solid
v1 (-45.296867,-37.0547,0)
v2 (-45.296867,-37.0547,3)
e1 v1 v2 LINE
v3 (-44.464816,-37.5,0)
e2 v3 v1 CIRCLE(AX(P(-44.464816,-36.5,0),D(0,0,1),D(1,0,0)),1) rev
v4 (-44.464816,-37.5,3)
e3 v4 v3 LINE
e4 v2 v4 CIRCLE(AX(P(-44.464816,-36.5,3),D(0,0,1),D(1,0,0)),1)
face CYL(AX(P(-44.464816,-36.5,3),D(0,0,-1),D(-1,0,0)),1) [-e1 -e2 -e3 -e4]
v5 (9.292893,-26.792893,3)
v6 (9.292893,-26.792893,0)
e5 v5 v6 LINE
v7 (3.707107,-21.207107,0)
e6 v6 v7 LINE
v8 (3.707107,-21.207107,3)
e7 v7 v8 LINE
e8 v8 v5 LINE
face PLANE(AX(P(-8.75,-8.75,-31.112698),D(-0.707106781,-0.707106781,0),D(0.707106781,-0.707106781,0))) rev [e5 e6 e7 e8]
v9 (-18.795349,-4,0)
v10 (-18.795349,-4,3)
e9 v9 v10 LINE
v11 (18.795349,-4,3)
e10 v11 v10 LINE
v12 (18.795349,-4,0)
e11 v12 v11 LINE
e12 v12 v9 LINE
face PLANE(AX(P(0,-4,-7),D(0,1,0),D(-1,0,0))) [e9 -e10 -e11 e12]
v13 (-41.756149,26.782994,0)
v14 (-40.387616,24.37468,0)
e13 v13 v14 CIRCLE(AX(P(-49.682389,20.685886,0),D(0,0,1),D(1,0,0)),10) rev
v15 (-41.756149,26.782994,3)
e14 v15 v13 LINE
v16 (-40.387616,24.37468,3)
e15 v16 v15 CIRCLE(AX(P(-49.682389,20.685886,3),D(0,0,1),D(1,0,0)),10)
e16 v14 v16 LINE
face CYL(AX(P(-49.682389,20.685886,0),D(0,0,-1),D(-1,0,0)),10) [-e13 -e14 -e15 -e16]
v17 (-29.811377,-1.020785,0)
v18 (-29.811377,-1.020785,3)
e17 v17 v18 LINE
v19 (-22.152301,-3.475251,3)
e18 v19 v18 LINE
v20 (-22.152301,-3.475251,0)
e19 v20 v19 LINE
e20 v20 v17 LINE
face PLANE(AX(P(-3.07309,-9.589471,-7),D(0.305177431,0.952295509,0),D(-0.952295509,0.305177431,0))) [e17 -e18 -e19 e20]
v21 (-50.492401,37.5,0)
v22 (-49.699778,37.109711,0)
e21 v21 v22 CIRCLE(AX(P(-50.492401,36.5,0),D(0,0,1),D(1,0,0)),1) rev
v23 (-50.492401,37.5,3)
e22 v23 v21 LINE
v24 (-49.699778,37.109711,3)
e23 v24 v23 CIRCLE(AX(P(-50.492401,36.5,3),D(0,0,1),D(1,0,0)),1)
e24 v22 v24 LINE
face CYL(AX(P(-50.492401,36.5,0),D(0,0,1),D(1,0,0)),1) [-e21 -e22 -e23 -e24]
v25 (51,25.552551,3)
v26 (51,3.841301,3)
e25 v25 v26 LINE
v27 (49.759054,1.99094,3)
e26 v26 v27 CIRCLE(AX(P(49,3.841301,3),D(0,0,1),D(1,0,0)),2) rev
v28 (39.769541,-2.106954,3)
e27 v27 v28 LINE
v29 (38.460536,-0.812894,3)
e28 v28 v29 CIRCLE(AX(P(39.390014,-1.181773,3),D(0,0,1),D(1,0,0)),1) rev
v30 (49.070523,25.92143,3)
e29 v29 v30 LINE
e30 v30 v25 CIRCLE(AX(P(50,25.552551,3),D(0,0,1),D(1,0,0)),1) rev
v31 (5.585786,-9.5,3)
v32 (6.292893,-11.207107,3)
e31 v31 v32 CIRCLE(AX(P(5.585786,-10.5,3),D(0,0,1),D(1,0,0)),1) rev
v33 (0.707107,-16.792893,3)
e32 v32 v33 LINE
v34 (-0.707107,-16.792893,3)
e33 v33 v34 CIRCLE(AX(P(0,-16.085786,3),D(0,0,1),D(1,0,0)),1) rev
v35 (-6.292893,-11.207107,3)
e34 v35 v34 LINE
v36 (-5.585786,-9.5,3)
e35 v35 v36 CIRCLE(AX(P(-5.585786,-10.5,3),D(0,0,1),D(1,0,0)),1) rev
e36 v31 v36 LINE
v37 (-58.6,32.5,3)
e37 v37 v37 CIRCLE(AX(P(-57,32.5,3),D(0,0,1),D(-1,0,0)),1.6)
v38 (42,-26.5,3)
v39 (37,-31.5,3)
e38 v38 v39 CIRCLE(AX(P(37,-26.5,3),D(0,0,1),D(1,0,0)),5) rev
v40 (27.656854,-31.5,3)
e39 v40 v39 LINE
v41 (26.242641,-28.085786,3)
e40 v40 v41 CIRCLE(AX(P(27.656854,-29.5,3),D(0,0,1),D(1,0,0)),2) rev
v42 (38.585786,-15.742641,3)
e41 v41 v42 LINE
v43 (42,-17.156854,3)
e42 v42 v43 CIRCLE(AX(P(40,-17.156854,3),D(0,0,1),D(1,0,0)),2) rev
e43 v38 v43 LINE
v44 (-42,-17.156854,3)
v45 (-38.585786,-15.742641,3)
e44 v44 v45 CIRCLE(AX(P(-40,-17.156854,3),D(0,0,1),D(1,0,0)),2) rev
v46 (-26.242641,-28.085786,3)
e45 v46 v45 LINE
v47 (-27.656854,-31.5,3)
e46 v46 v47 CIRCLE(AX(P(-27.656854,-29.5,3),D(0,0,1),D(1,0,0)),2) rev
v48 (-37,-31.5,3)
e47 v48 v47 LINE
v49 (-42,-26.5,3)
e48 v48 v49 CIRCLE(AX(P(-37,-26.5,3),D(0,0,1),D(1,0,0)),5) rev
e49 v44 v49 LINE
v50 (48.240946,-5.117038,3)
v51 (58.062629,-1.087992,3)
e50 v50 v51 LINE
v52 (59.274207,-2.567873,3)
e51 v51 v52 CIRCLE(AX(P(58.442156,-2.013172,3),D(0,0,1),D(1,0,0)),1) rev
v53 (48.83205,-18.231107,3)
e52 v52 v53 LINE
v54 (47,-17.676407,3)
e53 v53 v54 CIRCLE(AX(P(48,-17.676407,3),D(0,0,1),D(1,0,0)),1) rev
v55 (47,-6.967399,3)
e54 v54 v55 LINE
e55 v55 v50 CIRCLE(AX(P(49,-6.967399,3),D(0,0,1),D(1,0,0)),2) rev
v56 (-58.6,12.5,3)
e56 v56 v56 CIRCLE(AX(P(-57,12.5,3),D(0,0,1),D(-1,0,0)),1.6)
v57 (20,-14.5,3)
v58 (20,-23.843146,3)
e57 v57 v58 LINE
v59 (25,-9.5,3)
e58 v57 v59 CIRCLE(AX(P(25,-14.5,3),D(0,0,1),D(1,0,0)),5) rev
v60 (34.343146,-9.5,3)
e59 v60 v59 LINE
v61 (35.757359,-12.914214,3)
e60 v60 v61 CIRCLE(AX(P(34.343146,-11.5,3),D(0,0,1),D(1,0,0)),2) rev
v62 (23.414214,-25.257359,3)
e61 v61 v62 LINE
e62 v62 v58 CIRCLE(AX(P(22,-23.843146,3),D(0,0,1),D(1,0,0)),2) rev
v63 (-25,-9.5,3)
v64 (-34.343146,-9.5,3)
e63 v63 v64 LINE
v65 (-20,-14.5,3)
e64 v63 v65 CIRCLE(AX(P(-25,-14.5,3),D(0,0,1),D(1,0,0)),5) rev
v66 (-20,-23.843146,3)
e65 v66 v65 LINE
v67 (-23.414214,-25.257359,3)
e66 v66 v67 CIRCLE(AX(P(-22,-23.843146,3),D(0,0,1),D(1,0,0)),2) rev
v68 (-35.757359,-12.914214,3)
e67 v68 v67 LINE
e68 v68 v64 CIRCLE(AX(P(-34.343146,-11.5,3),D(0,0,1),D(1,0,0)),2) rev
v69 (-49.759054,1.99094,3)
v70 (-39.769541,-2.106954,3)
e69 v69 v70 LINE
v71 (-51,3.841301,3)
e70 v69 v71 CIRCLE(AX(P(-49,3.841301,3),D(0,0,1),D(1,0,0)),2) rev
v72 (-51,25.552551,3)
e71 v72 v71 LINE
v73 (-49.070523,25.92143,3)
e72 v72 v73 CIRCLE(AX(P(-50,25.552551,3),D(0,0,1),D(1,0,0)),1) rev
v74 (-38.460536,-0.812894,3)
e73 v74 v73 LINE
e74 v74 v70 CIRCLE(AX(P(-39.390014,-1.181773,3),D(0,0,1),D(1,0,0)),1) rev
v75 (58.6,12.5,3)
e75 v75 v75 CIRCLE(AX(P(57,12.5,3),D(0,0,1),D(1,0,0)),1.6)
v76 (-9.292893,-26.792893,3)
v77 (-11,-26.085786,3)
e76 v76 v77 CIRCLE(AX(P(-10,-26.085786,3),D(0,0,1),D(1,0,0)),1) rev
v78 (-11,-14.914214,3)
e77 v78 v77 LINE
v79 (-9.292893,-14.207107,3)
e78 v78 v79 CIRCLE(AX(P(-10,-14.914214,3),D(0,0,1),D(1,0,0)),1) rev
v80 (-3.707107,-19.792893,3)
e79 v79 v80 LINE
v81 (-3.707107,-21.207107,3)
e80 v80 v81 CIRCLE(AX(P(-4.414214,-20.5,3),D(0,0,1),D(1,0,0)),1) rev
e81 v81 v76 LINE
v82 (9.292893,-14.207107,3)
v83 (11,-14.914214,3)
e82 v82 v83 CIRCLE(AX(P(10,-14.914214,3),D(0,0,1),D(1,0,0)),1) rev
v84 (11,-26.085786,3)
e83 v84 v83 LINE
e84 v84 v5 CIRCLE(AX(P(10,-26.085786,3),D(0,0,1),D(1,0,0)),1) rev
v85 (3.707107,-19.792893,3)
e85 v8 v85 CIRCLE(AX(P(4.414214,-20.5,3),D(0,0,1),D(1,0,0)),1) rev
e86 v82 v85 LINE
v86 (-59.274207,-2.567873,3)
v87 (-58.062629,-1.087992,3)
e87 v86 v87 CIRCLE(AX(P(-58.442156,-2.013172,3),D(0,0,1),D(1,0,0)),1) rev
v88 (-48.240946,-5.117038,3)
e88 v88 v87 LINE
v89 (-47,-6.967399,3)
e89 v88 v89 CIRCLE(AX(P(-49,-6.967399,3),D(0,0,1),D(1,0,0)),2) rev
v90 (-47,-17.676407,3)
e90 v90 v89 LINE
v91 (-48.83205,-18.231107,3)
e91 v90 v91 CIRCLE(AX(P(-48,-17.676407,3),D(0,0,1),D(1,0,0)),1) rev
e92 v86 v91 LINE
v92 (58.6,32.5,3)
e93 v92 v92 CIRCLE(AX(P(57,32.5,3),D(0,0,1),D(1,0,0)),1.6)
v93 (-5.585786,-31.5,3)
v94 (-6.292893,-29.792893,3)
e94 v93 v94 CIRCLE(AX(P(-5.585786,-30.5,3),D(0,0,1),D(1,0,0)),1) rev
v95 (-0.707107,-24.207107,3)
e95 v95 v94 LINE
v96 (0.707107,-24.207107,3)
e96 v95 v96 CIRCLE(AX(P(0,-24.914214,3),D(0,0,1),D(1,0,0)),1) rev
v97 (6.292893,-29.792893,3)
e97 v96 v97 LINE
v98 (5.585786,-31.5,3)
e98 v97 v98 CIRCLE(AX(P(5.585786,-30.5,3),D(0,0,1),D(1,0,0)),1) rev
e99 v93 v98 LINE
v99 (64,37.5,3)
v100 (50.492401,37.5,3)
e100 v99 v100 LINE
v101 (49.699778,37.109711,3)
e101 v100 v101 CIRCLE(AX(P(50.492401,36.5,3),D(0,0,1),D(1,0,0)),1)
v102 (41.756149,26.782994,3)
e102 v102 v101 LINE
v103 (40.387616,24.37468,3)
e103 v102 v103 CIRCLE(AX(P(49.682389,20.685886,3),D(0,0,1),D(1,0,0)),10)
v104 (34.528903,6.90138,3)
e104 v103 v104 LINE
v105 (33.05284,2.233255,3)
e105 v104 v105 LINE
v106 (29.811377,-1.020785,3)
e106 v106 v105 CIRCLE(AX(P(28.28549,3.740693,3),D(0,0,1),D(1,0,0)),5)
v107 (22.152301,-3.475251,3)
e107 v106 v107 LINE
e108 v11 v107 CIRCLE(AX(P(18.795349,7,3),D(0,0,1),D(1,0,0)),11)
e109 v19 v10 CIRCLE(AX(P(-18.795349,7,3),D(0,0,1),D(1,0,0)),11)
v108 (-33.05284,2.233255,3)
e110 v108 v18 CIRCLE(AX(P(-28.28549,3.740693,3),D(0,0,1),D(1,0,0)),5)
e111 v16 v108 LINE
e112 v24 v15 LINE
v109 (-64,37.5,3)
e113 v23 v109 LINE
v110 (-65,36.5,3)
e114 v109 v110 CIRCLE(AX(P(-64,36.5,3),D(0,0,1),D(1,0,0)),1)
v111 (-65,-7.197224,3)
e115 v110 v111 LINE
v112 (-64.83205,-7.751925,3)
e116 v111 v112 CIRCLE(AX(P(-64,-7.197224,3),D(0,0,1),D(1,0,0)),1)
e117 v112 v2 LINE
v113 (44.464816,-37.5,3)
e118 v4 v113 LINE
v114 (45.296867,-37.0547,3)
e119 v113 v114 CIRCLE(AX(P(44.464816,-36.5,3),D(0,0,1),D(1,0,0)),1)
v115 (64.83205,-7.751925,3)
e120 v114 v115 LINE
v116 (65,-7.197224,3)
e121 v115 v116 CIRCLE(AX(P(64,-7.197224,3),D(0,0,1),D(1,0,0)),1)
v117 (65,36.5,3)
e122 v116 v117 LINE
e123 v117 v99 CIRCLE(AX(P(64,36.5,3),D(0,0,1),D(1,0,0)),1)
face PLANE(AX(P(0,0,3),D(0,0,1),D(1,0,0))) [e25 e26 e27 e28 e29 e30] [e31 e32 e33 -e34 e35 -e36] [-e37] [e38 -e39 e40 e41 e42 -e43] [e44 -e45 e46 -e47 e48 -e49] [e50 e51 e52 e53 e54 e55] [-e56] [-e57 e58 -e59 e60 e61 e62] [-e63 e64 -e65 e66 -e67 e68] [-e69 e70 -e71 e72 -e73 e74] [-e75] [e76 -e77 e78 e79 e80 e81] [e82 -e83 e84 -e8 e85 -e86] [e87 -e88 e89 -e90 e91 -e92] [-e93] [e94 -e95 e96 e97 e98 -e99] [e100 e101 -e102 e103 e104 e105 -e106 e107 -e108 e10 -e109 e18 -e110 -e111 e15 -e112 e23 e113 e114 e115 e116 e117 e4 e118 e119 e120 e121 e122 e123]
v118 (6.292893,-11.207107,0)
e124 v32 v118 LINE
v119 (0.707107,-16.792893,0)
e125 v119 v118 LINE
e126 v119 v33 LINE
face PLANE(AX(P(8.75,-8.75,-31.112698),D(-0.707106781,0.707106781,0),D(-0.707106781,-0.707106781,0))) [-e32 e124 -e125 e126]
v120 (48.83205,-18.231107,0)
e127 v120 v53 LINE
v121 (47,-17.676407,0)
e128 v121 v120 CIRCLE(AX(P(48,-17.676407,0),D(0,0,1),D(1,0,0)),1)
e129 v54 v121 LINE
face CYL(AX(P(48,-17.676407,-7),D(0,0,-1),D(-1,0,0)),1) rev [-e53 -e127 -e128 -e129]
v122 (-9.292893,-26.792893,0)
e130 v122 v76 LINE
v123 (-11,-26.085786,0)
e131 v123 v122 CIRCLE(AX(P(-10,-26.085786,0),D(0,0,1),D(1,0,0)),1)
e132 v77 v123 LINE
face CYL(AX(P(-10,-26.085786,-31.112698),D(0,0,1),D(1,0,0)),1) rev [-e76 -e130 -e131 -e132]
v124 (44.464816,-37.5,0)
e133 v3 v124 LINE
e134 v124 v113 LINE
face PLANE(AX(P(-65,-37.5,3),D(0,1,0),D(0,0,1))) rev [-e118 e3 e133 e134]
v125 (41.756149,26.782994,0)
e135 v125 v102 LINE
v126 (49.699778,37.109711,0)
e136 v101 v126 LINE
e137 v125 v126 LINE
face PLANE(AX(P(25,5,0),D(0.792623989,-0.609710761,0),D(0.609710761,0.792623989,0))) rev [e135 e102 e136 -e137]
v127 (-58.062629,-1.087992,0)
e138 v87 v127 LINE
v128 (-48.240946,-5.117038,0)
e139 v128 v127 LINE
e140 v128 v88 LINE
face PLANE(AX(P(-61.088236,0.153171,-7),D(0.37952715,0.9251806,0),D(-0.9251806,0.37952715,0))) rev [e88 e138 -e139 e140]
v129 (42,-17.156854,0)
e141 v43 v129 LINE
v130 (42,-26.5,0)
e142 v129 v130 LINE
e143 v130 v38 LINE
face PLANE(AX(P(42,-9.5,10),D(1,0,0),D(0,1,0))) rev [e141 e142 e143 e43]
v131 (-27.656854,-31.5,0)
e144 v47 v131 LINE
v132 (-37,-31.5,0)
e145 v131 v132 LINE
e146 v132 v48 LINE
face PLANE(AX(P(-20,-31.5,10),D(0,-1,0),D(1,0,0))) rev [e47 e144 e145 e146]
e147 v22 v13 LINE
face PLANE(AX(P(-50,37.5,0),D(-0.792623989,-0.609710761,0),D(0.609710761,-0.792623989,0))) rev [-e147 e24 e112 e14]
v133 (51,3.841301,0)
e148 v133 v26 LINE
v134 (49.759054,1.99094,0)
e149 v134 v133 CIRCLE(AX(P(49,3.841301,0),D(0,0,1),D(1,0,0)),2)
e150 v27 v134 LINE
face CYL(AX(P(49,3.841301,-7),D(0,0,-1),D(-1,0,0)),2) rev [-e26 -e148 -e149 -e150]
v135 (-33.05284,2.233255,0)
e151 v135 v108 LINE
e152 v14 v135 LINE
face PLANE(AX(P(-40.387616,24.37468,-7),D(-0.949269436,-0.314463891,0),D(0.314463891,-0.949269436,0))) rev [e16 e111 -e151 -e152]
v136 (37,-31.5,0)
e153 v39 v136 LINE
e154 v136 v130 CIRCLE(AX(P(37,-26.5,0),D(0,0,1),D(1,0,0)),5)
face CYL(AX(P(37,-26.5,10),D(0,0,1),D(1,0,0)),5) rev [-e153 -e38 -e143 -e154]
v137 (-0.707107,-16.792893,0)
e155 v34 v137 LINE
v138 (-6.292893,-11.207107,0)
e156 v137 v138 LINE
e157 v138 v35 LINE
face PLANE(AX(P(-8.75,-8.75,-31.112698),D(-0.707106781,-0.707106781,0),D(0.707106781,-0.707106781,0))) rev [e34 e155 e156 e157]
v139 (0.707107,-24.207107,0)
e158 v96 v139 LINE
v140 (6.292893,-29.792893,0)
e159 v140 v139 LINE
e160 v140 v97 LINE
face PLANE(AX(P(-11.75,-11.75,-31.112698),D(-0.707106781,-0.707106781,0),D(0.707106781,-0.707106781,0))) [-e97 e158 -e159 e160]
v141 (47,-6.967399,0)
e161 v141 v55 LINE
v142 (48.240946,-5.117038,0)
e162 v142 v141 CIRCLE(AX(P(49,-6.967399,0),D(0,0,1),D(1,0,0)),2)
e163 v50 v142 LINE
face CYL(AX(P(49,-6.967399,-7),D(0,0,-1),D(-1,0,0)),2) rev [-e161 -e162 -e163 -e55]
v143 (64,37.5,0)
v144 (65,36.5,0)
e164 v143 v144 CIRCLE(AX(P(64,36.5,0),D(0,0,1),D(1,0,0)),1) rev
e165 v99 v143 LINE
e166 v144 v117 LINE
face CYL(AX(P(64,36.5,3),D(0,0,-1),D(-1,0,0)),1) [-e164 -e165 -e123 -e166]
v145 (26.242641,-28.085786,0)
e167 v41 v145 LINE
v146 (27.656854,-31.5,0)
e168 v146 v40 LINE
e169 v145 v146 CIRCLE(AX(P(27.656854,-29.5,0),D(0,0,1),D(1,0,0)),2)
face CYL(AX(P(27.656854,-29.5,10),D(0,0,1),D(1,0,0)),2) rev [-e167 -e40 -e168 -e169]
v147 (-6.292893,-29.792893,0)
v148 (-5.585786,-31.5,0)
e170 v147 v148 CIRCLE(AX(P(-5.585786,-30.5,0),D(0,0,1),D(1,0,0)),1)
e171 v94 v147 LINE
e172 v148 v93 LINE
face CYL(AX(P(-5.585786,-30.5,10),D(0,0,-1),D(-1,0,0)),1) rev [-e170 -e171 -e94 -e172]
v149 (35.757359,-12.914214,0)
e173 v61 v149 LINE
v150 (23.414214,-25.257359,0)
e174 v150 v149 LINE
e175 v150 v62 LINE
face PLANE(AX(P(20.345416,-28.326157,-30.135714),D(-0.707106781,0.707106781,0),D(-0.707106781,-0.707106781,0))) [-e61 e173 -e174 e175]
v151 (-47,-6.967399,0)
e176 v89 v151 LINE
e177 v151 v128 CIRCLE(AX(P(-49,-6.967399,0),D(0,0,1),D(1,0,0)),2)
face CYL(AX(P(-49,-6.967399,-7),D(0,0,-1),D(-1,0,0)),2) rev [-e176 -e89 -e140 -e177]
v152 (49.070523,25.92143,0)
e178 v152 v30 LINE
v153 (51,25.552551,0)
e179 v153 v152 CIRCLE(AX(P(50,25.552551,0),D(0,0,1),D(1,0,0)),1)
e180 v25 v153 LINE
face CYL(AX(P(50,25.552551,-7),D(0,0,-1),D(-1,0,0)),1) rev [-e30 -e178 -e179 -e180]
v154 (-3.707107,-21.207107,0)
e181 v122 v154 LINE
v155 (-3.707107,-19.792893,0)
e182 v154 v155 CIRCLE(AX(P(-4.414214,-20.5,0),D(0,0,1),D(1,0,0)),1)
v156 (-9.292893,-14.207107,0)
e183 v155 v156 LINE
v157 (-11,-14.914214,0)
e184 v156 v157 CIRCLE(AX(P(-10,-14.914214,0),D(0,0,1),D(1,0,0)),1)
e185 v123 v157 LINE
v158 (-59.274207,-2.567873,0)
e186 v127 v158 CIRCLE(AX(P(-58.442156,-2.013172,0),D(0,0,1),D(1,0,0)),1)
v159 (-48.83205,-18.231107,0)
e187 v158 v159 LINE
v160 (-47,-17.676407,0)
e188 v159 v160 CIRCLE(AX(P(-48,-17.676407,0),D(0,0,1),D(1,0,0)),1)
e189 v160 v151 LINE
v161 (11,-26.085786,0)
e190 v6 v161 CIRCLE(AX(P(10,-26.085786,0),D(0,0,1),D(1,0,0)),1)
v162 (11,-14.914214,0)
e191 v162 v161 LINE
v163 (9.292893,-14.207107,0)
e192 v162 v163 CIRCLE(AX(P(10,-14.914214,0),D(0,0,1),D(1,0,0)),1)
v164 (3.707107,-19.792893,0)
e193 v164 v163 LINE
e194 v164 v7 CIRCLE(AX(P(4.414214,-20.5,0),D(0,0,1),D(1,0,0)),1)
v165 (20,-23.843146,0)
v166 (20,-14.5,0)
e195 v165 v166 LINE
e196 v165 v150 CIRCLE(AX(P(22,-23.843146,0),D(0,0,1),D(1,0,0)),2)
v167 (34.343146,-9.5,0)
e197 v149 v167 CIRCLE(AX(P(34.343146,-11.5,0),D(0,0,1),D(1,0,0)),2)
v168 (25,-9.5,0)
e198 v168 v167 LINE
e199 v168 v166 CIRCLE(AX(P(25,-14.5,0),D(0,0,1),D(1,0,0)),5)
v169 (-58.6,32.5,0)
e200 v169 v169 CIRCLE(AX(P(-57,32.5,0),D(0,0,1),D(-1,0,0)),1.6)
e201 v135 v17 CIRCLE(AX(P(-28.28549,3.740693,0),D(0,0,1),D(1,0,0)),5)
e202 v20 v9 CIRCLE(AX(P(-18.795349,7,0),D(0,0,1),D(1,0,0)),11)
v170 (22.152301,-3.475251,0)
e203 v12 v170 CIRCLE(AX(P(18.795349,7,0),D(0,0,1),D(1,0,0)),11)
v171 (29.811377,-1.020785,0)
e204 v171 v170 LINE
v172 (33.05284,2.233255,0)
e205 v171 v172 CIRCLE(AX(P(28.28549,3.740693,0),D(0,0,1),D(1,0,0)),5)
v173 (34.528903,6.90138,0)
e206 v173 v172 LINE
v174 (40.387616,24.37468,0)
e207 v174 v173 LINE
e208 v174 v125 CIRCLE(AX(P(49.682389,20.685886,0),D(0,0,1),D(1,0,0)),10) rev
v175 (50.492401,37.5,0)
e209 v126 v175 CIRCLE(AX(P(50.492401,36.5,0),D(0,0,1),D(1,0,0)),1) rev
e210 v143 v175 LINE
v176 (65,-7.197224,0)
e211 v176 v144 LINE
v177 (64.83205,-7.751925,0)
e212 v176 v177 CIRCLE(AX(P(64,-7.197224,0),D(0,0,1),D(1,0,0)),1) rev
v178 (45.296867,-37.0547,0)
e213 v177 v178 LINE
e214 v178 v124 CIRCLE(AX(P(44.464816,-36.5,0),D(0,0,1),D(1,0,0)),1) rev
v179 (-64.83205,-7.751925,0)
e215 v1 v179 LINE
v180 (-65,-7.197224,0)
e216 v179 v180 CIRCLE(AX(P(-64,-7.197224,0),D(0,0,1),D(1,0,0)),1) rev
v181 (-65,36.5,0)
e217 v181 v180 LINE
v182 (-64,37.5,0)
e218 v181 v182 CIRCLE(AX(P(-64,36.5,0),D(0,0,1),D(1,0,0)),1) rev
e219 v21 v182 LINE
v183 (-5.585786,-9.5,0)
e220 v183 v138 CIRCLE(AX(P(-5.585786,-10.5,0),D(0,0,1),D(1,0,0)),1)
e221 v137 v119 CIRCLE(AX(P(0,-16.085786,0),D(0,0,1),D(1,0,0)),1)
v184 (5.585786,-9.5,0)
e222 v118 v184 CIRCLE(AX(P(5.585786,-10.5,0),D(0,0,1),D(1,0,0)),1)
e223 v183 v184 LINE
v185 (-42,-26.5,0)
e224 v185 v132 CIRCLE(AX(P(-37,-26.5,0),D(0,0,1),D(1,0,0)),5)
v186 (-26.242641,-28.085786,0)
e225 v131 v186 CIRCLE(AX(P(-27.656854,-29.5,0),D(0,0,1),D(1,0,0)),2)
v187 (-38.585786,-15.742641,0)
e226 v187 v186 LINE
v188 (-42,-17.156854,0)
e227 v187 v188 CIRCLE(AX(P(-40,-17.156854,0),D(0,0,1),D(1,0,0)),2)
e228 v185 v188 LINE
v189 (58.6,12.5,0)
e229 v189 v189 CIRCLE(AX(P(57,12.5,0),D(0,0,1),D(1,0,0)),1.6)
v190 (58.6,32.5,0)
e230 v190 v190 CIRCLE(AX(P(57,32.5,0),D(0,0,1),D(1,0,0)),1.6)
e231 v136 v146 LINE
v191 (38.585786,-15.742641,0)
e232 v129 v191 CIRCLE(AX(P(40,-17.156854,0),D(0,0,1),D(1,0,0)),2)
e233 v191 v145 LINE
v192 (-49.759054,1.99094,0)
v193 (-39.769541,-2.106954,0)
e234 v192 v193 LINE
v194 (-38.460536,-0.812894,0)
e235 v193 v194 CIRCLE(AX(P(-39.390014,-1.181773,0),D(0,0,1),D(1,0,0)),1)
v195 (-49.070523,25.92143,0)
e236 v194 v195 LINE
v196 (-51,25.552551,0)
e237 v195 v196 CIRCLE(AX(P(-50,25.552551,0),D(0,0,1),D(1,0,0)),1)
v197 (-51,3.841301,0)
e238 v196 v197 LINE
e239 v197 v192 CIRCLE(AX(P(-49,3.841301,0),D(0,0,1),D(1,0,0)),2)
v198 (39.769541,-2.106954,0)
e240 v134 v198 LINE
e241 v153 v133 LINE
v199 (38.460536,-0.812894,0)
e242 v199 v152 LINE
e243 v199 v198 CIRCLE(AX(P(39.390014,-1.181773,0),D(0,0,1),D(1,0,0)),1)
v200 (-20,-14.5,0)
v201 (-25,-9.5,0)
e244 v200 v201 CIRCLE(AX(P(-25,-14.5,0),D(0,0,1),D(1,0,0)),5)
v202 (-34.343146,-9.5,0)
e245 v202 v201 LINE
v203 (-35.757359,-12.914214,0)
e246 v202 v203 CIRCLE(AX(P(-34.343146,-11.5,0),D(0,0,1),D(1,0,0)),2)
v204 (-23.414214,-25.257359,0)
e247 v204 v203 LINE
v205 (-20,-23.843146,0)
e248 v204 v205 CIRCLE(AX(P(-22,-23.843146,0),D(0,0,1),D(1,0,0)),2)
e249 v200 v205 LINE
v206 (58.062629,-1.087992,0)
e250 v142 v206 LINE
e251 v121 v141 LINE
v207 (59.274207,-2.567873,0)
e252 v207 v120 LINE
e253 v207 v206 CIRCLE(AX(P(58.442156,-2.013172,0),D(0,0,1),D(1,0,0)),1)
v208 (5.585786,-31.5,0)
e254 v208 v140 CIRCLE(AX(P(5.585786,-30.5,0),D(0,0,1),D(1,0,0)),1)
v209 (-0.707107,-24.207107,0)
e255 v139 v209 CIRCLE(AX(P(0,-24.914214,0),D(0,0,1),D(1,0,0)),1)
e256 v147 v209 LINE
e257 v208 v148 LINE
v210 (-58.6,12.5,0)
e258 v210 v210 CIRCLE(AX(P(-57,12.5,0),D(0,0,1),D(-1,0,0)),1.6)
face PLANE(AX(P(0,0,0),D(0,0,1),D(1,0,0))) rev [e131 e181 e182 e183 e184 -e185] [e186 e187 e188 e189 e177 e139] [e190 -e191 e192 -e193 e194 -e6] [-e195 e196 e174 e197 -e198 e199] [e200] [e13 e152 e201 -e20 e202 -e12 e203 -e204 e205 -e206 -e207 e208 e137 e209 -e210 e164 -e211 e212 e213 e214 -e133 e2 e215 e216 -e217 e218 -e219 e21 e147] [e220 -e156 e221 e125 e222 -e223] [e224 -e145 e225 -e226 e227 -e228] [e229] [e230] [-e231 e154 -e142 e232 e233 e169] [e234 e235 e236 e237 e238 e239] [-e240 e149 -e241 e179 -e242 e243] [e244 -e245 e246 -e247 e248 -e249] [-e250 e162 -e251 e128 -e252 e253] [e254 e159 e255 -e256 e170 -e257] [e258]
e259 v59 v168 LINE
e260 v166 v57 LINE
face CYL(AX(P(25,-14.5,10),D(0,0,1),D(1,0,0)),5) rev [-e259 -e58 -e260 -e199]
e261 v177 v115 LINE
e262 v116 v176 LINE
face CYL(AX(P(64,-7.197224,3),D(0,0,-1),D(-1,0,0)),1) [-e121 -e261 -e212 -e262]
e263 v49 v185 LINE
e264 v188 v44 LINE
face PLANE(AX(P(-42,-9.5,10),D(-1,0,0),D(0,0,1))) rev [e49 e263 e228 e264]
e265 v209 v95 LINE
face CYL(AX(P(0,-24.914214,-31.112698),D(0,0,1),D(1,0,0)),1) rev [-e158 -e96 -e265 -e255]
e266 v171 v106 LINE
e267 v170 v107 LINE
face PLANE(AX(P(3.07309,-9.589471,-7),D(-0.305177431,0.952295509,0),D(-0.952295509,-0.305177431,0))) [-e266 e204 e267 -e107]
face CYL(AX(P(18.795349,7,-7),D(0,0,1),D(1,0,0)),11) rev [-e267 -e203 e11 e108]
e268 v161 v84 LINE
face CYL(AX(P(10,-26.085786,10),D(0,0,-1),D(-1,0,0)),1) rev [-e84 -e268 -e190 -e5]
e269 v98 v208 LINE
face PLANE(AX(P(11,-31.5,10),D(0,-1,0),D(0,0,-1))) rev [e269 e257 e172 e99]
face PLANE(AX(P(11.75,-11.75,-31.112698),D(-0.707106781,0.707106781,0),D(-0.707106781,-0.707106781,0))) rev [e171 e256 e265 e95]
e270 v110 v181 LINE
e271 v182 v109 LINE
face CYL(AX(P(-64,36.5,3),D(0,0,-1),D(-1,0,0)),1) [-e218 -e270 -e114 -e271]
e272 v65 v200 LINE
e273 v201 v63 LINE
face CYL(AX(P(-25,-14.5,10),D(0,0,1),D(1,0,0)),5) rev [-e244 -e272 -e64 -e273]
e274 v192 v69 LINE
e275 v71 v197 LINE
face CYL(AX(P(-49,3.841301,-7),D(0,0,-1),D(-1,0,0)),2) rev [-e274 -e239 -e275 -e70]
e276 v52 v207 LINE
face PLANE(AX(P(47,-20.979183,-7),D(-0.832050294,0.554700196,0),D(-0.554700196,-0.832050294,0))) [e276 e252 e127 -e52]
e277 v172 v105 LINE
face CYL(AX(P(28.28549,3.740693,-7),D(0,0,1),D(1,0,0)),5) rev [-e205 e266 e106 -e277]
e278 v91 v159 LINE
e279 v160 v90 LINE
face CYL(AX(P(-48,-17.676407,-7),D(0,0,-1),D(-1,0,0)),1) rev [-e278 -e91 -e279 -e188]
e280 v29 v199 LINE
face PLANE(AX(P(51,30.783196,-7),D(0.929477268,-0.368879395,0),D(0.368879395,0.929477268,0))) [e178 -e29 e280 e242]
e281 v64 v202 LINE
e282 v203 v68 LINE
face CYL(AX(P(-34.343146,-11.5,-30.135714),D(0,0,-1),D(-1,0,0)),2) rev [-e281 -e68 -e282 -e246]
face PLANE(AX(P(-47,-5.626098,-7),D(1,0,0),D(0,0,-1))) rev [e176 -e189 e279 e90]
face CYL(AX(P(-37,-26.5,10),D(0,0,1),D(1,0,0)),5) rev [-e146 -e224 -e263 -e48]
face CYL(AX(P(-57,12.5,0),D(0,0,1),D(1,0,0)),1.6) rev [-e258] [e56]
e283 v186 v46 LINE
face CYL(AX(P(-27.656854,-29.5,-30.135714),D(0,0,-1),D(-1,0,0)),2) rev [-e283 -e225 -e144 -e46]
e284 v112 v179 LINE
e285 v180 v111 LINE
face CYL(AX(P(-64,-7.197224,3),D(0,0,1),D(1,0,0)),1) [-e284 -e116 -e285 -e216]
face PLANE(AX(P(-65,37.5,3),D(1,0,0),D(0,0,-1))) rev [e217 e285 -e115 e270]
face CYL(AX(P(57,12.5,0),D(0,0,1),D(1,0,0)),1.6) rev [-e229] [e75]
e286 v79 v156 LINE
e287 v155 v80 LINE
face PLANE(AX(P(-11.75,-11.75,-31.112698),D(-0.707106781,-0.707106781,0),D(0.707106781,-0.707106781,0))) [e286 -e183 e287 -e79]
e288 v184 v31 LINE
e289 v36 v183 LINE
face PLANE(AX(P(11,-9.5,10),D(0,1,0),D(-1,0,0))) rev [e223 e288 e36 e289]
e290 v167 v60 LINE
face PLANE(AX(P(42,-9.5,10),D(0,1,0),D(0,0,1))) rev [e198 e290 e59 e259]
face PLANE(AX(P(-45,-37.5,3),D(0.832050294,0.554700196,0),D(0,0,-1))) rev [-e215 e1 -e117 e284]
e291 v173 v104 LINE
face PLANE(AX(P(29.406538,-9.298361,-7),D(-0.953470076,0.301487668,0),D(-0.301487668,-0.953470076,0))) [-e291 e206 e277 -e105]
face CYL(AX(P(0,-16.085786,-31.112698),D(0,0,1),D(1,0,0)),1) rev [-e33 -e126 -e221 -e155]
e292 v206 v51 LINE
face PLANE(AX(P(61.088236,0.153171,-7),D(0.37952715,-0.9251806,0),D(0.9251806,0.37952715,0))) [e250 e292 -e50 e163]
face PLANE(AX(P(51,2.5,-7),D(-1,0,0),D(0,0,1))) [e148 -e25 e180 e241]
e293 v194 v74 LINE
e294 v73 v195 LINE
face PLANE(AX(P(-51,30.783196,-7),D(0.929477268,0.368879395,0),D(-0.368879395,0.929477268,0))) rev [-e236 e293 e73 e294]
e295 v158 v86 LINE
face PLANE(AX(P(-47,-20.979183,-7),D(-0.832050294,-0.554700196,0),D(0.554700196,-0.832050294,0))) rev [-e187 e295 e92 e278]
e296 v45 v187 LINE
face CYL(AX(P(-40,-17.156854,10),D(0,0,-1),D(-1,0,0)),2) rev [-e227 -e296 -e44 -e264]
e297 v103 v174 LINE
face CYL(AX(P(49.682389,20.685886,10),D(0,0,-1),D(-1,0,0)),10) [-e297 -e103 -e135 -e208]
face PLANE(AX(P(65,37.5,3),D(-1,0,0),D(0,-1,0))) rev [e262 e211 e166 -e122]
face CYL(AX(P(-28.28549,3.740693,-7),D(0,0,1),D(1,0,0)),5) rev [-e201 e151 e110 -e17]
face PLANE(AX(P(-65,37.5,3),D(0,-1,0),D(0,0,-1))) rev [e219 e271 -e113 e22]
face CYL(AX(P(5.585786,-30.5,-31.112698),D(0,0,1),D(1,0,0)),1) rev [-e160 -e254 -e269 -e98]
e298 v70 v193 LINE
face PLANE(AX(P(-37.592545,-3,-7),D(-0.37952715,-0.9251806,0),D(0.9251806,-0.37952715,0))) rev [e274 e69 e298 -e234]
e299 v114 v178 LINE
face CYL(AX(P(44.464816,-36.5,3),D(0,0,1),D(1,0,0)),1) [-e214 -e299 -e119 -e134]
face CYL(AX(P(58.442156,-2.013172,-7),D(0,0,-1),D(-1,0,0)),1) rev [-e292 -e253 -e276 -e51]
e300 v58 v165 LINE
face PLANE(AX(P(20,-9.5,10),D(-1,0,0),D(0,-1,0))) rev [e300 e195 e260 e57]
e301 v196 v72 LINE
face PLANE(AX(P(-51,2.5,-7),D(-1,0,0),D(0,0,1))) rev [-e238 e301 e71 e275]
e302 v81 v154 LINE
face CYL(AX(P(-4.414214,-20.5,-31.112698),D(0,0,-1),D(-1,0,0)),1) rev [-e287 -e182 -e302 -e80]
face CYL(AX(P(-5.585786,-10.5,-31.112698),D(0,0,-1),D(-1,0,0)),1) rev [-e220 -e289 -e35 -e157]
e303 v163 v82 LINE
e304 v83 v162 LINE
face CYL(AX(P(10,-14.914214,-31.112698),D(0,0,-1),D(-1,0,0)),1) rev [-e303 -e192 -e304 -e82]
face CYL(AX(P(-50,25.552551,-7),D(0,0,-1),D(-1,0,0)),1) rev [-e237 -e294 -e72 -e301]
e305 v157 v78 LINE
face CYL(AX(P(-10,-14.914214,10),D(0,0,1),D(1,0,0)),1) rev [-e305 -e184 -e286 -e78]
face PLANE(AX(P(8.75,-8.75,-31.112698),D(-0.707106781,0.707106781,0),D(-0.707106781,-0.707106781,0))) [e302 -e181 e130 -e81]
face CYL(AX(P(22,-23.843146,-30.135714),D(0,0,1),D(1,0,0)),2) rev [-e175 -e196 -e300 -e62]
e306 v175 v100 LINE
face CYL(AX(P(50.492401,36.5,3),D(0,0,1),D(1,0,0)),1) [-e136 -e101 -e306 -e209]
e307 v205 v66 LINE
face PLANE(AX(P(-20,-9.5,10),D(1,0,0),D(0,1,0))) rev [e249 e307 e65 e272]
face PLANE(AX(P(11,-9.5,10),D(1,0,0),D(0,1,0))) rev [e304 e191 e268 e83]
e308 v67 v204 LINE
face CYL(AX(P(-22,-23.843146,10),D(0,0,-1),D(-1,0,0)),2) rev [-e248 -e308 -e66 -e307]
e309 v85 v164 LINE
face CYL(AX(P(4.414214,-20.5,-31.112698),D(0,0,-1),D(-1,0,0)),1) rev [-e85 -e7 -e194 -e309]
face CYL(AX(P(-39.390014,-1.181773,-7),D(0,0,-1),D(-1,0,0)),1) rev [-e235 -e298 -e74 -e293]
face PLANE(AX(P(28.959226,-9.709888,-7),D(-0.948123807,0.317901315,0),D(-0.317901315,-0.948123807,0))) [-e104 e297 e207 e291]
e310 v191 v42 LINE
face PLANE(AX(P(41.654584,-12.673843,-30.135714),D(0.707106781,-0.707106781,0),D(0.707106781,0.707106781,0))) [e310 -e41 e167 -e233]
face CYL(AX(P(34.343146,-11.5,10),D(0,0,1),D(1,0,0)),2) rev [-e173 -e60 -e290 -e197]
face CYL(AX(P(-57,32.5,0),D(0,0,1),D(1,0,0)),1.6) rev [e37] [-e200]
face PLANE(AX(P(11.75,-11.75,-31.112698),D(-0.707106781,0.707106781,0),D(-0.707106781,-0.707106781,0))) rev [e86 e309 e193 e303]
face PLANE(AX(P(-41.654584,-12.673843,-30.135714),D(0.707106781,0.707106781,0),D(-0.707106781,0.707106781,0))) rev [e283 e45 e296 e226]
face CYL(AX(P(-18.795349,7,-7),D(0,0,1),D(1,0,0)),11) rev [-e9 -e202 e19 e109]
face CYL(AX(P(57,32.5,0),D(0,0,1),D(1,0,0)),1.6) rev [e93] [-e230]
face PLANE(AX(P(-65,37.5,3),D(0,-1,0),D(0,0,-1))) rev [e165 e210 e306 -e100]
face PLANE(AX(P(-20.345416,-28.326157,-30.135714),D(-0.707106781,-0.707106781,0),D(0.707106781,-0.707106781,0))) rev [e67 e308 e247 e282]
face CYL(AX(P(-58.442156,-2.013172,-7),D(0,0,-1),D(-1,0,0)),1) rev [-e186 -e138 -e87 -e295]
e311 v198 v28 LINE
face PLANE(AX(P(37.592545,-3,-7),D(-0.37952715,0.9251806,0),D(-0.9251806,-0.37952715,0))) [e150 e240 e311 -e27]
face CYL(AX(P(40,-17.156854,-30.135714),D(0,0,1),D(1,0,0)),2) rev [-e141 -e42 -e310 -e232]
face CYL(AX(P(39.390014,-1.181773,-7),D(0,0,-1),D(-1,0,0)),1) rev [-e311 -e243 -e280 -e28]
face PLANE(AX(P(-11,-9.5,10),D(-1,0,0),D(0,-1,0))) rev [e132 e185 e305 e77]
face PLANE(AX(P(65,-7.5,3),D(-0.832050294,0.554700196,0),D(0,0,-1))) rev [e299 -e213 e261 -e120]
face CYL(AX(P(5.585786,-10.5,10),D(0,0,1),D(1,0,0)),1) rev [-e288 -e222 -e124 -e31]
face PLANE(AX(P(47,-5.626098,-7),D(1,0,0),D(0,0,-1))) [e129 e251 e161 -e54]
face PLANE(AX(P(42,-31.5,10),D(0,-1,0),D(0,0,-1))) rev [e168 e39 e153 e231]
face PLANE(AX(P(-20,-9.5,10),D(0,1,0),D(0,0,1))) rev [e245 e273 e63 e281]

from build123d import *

# Parameters (mm, degrees)
SKETCH_1_W              = 130
SKETCH_1_H              = 75
EXTRUDE_1_DEPTH         = 3
CHAMFER_1_SIZE          = 20
CHAMFER_1_SIZE2         = 30
CHAMFER_2_SIZE          = 30
CHAMFER_2_SIZE2         = 20
SKETCH_2_R              = 1.6
CUT_EXTRUDE_1_DEPTH     = 76.101597853
CUT_EXTRUDE_2_DEPTH     = 76.101597853
CHAMFER_3_SIZE          = 10
FILLET_2_R              = 5
CUT_EXTRUDE_6_DEPTH     = 10
FILLET_5_R              = 10
SKETCH_11_W             = 22
SKETCH_11_H             = 22
CUT_EXTRUDE_7_DEPTH     = 10
FILLET_6_R              = 5
EXTRUDE_2_DEPTH         = 3
FILLET_7_R              = 1
CUT_EXTRUDE_8_DEPTH     = 10
FILLET_8_R              = 1
FILLET_9_R              = 2
FILLET_8_OF_MIRROR_1_R  = 1
FILLET_9_OF_MIRROR_1_R  = 2
EXTRUDE_3_DEPTH         = 3
FILLET_10_DEPTH         = 3
CUT_EXTRUDE_9_DEPTH     = 10
FILLET_11_R             = 4
FILLET_11_OF_MIRROR_3_R = 4
FILLET_12_R             = 1
CUT_EXTRUDE_10_DEPTH    = 10
CUT_EXTRUDE_11_DEPTH    = 10


with BuildPart() as part:
    # 草图1 → 凸台-拉伸1 (new body)
    with BuildSketch(Plane.XY):
        Rectangle(SKETCH_1_W, SKETCH_1_H)
    extrude(amount=EXTRUDE_1_DEPTH)

    # 倒角1
    chamfer_1_edges = [part.edges().sort_by_distance(p)[0] for p in [
        (65, -37.5, 1.5),
    ]]
    chamfer_1_side = [part.faces().sort_by_distance(p)[0] for p in [
        (0, -37.5, 1.5),
    ]]
    chamfer(chamfer_1_edges, length=CHAMFER_1_SIZE, length2=CHAMFER_1_SIZE2, reference=chamfer_1_side[0])

    # 倒角2
    chamfer_2_edges = [part.edges().sort_by_distance(p)[0] for p in [
        (-65, -37.5, 1.5),
    ]]
    chamfer_2_side = [part.faces().sort_by_distance(p)[0] for p in [
        (-65, 0, 1.5),
    ]]
    chamfer(chamfer_2_edges, length=CHAMFER_2_SIZE, length2=CHAMFER_2_SIZE2, reference=chamfer_2_side[0])

    # 草图2 → 切除-拉伸1 (cut, through all)
    with BuildSketch(Plane.XY.offset(3)):
        with Locations((57, 32.5)):
            Circle(SKETCH_2_R)
        with Locations((57, 12.5)):
            Circle(SKETCH_2_R)
        with Locations(Location((-57, 12.5, 0), (0, 0, 180))):
            Circle(SKETCH_2_R)
        with Locations(Location((-57, 32.5, 0), (0, 0, 180))):
            Circle(SKETCH_2_R)
    extrude(amount=-CUT_EXTRUDE_1_DEPTH, mode=Mode.SUBTRACT)

    # 草图3 → 切除-拉伸2 (cut, through all)
    with BuildSketch(Plane.XY.offset(3)):
        Polygon((-50, 37.5), (-25, 5), (25, 5), (50, 37.5), align=None)
    extrude(amount=-CUT_EXTRUDE_2_DEPTH, mode=Mode.SUBTRACT)

    # 倒角3
    chamfer_3_edges = [part.edges().sort_by_distance(p)[0] for p in [
        (25, 5, 1.5),
        (-25, 5, 1.5),
    ]]
    chamfer(chamfer_3_edges, length=CHAMFER_3_SIZE)

    # 圆角2
    fillet_2_edges = [part.edges().sort_by_distance(p)[0] for p in [
        (31.097107608, 12.926239891, 1.5),
        (-15, 5, 1.5),
        (15, 5, 1.5),
        (-31.097107608, 12.926239891, 1.5),
    ]]
    fillet(fillet_2_edges, radius=FILLET_2_R)

    # 草图9 → 切除-拉伸6 (cut)
    with BuildSketch(Plane(origin=(0, 0, 0), x_dir=(-1, 0, 0), z_dir=(0, 0, -1))):
        Polygon((-8.056483751, -3), (8.056483751, -3), (22, -3), (32.5, 4.5), (40.903484361, 25.67452967), (-40.903484361, 25.67452967), (-32.5, 4.5), (-22, -3), align=None)
    extrude(amount=-CUT_EXTRUDE_6_DEPTH, mode=Mode.SUBTRACT)

    # 圆角5
    fillet_5_edges = [part.edges().sort_by_distance(p)[0] for p in [
        (-40.903484361, 25.67452967, 1.5),
        (22, -3, 1.5),
        (32.5, 4.5, 1.5),
        (40.903484361, 25.67452967, 1.5),
        (-32.5, 4.5, 1.5),
        (-22, -3, 1.5),
    ]]
    fillet(fillet_5_edges, radius=FILLET_5_R)

    # 草图11 → 切除-拉伸7 (cut)
    with BuildSketch(Plane(origin=(0, 0, 0), x_dir=(-1, 0, 0), z_dir=(0, 0, -1))):
        with Locations((0, -20.5)):
            Rectangle(SKETCH_11_W, SKETCH_11_H)
        with Locations((31, -20.5)):
            Rectangle(SKETCH_11_W, SKETCH_11_H)
        with Locations((-31, -20.5)):
            Rectangle(SKETCH_11_W, SKETCH_11_H)
    extrude(amount=-CUT_EXTRUDE_7_DEPTH, mode=Mode.SUBTRACT)

    # 圆角6
    fillet_6_edges = [part.edges().sort_by_distance(p)[0] for p in [
        (20, -9.5, 1.5),
        (20, -31.5, 1.5),
        (42, -31.5, 1.5),
        (42, -9.5, 1.5),
        (-42, -9.5, 1.5),
        (-42, -31.5, 1.5),
        (-20, -31.5, 1.5),
        (-20, -9.5, 1.5),
    ]]
    fillet(fillet_6_edges, radius=FILLET_6_R)

    # 草图12 → 凸台-拉伸2 (add)
    with BuildSketch(Plane.XY.offset(3)):
        Polygon((0, -17.5), (-8, -9.5), (-11, -12.5), (-3, -20.5), align=None)
        Polygon((-11, -12.5), (-8, -9.5), (-11, -9.5), align=None)
        Polygon((3, -20.5), (0, -17.5), (-3, -20.5), (0, -23.5), align=None)
        Polygon((11, -28.5), (3, -20.5), (0, -23.5), (8, -31.5), align=None)
        Polygon((8, -9.5), (0, -17.5), (3, -20.5), (11, -12.5), align=None)
        Polygon((11, -9.5), (8, -9.5), (11, -12.5), align=None)
        Polygon((11, -31.5), (11, -28.5), (8, -31.5), align=None)
        Polygon((0, -23.5), (-3, -20.5), (-11, -28.5), (-8, -31.5), align=None)
        Polygon((-8, -31.5), (-11, -28.5), (-11, -31.5), align=None)
    extrude(amount=-EXTRUDE_2_DEPTH)

    # 圆角7
    fillet_7_edges = [part.edges().sort_by_distance(p)[0] for p in [
        (-3, -20.5, 1.5),
        (-11, -12.5, 1.5),
        (-8, -9.5, 1.5),
        (0, -17.5, 1.5),
        (8, -9.5, 1.5),
        (11, -12.5, 1.5),
        (3, -20.5, 1.5),
        (11, -28.5, 1.5),
        (8, -31.5, 1.5),
        (0, -23.5, 1.5),
        (-8, -31.5, 1.5),
        (-11, -28.5, 1.5),
    ]]
    fillet(fillet_7_edges, radius=FILLET_7_R)

    # 草图13 → 切除-拉伸8 (cut)
    with BuildSketch(Plane.XY.offset(3)):
        Polygon((-51, 2.5), (-51, 30.783196083), (-37.592544704, -3), align=None)
        Polygon((-61.08823586, 0.153171073), (-47, -5.626098409), (-47, -20.979182717), align=None)
    cut_extrude_8 = extrude(amount=-CUT_EXTRUDE_8_DEPTH, mode=Mode.SUBTRACT)

    # 圆角8
    fillet_8_edges = [part.edges().sort_by_distance(p)[0] for p in [
        (-47, -20.979182717, 1.5),
        (-61.08823586, 0.153171073, 1.5),
        (-37.592544704, -3, 1.5),
        (-51, 30.783196083, 1.5),
    ]]
    fillet(fillet_8_edges, radius=FILLET_8_R)

    # 圆角9
    fillet_9_edges = [part.edges().sort_by_distance(p)[0] for p in [
        (-47, -5.626098409, 1.5),
        (-51, 2.5, 1.5),
    ]]
    fillet(fillet_9_edges, radius=FILLET_9_R)

    # 镜向1: 切除-拉伸8 across plane
    add(cut_extrude_8.mirror(Plane(origin=(0, 0, 0), x_dir=(0, 0, 1), z_dir=(1, 0, 0))), mode=Mode.SUBTRACT)

    # 圆角8 of 镜向1
    fillet_8_of_mirror_1_edges = [part.edges().sort_by_distance(p)[0] for p in [
        (47, -20.979182717, 1.5),
        (61.08823586, 0.153171073, 1.5),
        (37.592544704, -3, 1.5),
        (51, 30.783196083, 1.5),
    ]]
    fillet(fillet_8_of_mirror_1_edges, radius=FILLET_8_OF_MIRROR_1_R)

    # 圆角9 of 镜向1
    fillet_9_of_mirror_1_edges = [part.edges().sort_by_distance(p)[0] for p in [
        (47, -5.626098409, 1.5),
        (51, 2.5, 1.5),
    ]]
    fillet(fillet_9_of_mirror_1_edges, radius=FILLET_9_OF_MIRROR_1_R)

    # 草图14 → 凸台-拉伸3 (add)
    with BuildSketch(Plane.XY.offset(3)):
        with BuildLine():
            Line((41.654583912, -12.673843213), (23.173843213, -31.154583912))
            ThreePointArc((23.173843213, -31.154583912), (21.464466094, -30.035533906), (20.345416088, -28.326156787))
            Line((20.345416088, -28.326156787), (38.826156787, -9.845416088))
            ThreePointArc((38.826156787, -9.845416088), (40.535533906, -10.964466094), (41.654583912, -12.673843213))
        make_face()
    extrude_3 = extrude(amount=-EXTRUDE_3_DEPTH)

    # 镜向2: 凸台-拉伸3 across plane
    add(extrude_3.mirror(Plane(origin=(0, 0, 0), x_dir=(0, 0, 1), z_dir=(1, 0, 0))))

    # 圆角10: read off the stored shape, not the designer's step
    # 圆角10 outline → 圆角10 (add)
    with BuildSketch(Plane.XY):
        with BuildLine():
            ThreePointArc((27.656854249, -31.5), (25.809095184, -30.265366865), (26.242640687, -28.085786438))
            Line((26.242640687, -28.085786438), (23.173843213, -31.154583912))
            ThreePointArc((23.173843213, -31.154583912), (24.070731352, -31.412887112), (25, -31.5))
            Line((25, -31.5), (27.656854249, -31.5))
        make_face()
        with BuildLine():
            ThreePointArc((38.585786438, -15.742640687), (40.765366865, -15.309095184), (42, -17.156854249))
            Line((42, -17.156854249), (42, -14.5))
            ThreePointArc((42, -14.5), (41.912887112, -13.570731352), (41.654583912, -12.673843213))
            Line((41.654583912, -12.673843213), (38.585786438, -15.742640687))
        make_face()
        with BuildLine():
            ThreePointArc((34.343145751, -9.5), (36.190904816, -10.734633135), (35.757359313, -12.914213562))
            Line((35.757359313, -12.914213562), (38.826156787, -9.845416088))
            ThreePointArc((38.826156787, -9.845416088), (37.929268648, -9.587112888), (37, -9.5))
            Line((37, -9.5), (34.343145751, -9.5))
        make_face()
        with BuildLine():
            ThreePointArc((23.414213562, -25.257359313), (21.234633135, -25.690904816), (20, -23.843145751))
            Line((20, -23.843145751), (20, -26.5))
            ThreePointArc((20, -26.5), (20.087112888, -27.429268648), (20.345416088, -28.326156787))
            Line((20.345416088, -28.326156787), (23.414213562, -25.257359313))
        make_face()
        with BuildLine():
            Line((-23.173843213, -31.154583912), (-26.242640687, -28.085786438))
            ThreePointArc((-26.242640687, -28.085786438), (-25.809095184, -30.265366865), (-27.656854249, -31.5))
            Line((-27.656854249, -31.5), (-25, -31.5))
            ThreePointArc((-25, -31.5), (-24.070731352, -31.412887112), (-23.173843213, -31.154583912))
        make_face()
        with BuildLine():
            ThreePointArc((-42, -17.156854249), (-40.765366865, -15.309095184), (-38.585786438, -15.742640687))
            Line((-38.585786438, -15.742640687), (-41.654583912, -12.673843213))
            ThreePointArc((-41.654583912, -12.673843213), (-41.912887112, -13.570731352), (-42, -14.5))
            Line((-42, -14.5), (-42, -17.156854249))
        make_face()
        with BuildLine():
            Line((-20, -26.5), (-20, -23.843145751))
            ThreePointArc((-20, -23.843145751), (-21.234633135, -25.690904816), (-23.414213562, -25.257359313))
            Line((-23.414213562, -25.257359313), (-20.345416088, -28.326156787))
            ThreePointArc((-20.345416088, -28.326156787), (-20.087112888, -27.429268648), (-20, -26.5))
        make_face()
        with BuildLine():
            Line((-38.826156787, -9.845416088), (-35.757359313, -12.914213562))
            ThreePointArc((-35.757359313, -12.914213562), (-36.190904816, -10.734633135), (-34.343145751, -9.5))
            Line((-34.343145751, -9.5), (-37, -9.5))
            ThreePointArc((-37, -9.5), (-37.929268648, -9.587112888), (-38.826156787, -9.845416088))
        make_face()
    extrude(amount=FILLET_10_DEPTH)

    # 草图15 → 切除-拉伸9 (cut)
    with BuildSketch(Plane.XY.offset(3)):
        Polygon((33.586223757, 7.236992916), (31.475810078, 0.562702384), (21.847123776, -2.522955085), align=None)
    cut_extrude_9 = extrude(amount=-CUT_EXTRUDE_9_DEPTH, mode=Mode.SUBTRACT)

    # 圆角11
    fillet_11_edges = [part.edges().sort_by_distance(p)[0] for p in [
        (31.475810078, 0.562702384, 1.5),
    ]]
    fillet(fillet_11_edges, radius=FILLET_11_R)

    # 镜向3: 切除-拉伸9 across plane
    add(cut_extrude_9.mirror(Plane(origin=(0, 0, 0), x_dir=(0, 0, 1), z_dir=(1, 0, 0))), mode=Mode.SUBTRACT)

    # 圆角11 of 镜向3
    fillet_11_of_mirror_3_edges = [part.edges().sort_by_distance(p)[0] for p in [
        (-31.475810078, 0.562702384, 1.5),
    ]]
    fillet(fillet_11_of_mirror_3_edges, radius=FILLET_11_OF_MIRROR_3_R)

    # 圆角12
    fillet_12_edges = [part.edges().sort_by_distance(p)[0] for p in [
        (65, -7.5, 1.5),
        (-33.586223757, 7.236992916, 1.5),
        (33.586223757, 7.236992916, 1.5),
        (45, -37.5, 1.5),
        (-45, -37.5, 1.5),
        (-65, -7.5, 1.5),
        (-50, 37.5, 1.5),
        (50, 37.5, 1.5),
        (-65, 37.5, 1.5),
        (65, 37.5, 1.5),
    ]]
    fillet(fillet_12_edges, radius=FILLET_12_R)

    # 草图16 → 切除-拉伸10 (cut)
    with BuildSketch(Plane.XY.offset(3)):
        with BuildLine():
            Line((-34.528903423, 6.901380027), (-33.052840085, 2.233254695))
            ThreePointArc((-33.052840085, 2.233254695), (-31.827862137, 0.21201091), (-29.81137686, -1.020784506))
            Line((-29.81137686, -1.020784506), (-22.152301207, -3.475250594))
            ThreePointArc((-22.152301207, -3.475250594), (-20.494208416, -3.868020899), (-18.795349466, -4))
            Line((-18.795349466, -4), (18.795349466, -4))
            ThreePointArc((18.795349466, -4), (20.494208416, -3.868020899), (22.152301207, -3.475250594))
            Line((22.152301207, -3.475250594), (29.81137686, -1.020784506))
            ThreePointArc((29.81137686, -1.020784506), (31.827862137, 0.21201091), (33.052840085, 2.233254695))
            Line((33.052840085, 2.233254695), (34.528903423, 6.901380027))
            Line((34.528903423, 6.901380027), (40.387616156, 24.37467997))
            Line((40.387616156, 24.37467997), (33.586223757, 7.236992916))
            Line((33.586223757, 7.236992916), (32.099370009, 2.534742363))
            ThreePointArc((32.099370009, 2.534742363), (31.119387651, 0.917747336), (29.506199429, -0.068488997))
            Line((29.506199429, -0.068488997), (21.847123776, -2.522955085))
            ThreePointArc((21.847123776, -2.522955085), (20.339766693, -2.880018999), (18.795349466, -3))
            Line((18.795349466, -3), (-18.795349466, -3))
            ThreePointArc((-18.795349466, -3), (-20.339766693, -2.880018999), (-21.847123776, -2.522955085))
            Line((-21.847123776, -2.522955085), (-29.506199429, -0.068488997))
            ThreePointArc((-29.506199429, -0.068488997), (-31.119387651, 0.917747336), (-32.099370009, 2.534742363))
            Line((-32.099370009, 2.534742363), (-33.575433347, 7.202867695))
            Line((-33.575433347, 7.202867695), (-40.387616156, 24.37467997))
            Line((-40.387616156, 24.37467997), (-34.528903423, 6.901380027))
        make_face()
        with BuildLine():
            Line((-33.586223757, 7.236992916), (-33.599426154, 7.270259421))
            ThreePointArc((-33.599426154, 7.270259421), (-33.586826947, 7.236778169), (-33.575433347, 7.202867695))
            Line((-33.575433347, 7.202867695), (-33.586223757, 7.236992916))
        make_face()
    extrude(amount=-CUT_EXTRUDE_10_DEPTH, mode=Mode.SUBTRACT)


with BuildPart() as cut_extrude_10_piece_1:
    # of the separate pieces the step leaves, piece 1, a body of its own (cut_extrude_10_pieces)
    add(part.part.solids().sort_by_distance((-49.699777508, 37.109710761, 0))[0])


with BuildPart() as cut_extrude_10_piece_2:
    # of the separate pieces the step leaves, piece 2, a body of its own (cut_extrude_10_pieces)
    add(part.part.solids().sort_by_distance((-33.575433347, 7.202867695, 0))[0])


with BuildPart() as cut_extrude_11_tool:
    # 草图17 → 切除-拉伸11 (new body)
    with BuildSketch(Plane.XY.offset(3)):
        Polygon((-40.387616156, 24.37467997), (-33.052840085, 2.233254695), (0, 0), align=None)
    extrude(amount=-CUT_EXTRUDE_11_DEPTH)


with BuildPart() as cut_extrude_10_piece_1_1:
    add(cut_extrude_10_piece_1.part)

    # 切除-拉伸11: cut by cut_extrude_11_tool
    add(cut_extrude_11_tool.part, mode=Mode.SUBTRACT)


with BuildPart() as cut_extrude_10_piece_2_1:
    add(cut_extrude_10_piece_2.part)

    # 切除-拉伸11: cut by cut_extrude_11_tool
    add(cut_extrude_11_tool.part, mode=Mode.SUBTRACT)


solid = cut_extrude_10_piece_1_1.part
